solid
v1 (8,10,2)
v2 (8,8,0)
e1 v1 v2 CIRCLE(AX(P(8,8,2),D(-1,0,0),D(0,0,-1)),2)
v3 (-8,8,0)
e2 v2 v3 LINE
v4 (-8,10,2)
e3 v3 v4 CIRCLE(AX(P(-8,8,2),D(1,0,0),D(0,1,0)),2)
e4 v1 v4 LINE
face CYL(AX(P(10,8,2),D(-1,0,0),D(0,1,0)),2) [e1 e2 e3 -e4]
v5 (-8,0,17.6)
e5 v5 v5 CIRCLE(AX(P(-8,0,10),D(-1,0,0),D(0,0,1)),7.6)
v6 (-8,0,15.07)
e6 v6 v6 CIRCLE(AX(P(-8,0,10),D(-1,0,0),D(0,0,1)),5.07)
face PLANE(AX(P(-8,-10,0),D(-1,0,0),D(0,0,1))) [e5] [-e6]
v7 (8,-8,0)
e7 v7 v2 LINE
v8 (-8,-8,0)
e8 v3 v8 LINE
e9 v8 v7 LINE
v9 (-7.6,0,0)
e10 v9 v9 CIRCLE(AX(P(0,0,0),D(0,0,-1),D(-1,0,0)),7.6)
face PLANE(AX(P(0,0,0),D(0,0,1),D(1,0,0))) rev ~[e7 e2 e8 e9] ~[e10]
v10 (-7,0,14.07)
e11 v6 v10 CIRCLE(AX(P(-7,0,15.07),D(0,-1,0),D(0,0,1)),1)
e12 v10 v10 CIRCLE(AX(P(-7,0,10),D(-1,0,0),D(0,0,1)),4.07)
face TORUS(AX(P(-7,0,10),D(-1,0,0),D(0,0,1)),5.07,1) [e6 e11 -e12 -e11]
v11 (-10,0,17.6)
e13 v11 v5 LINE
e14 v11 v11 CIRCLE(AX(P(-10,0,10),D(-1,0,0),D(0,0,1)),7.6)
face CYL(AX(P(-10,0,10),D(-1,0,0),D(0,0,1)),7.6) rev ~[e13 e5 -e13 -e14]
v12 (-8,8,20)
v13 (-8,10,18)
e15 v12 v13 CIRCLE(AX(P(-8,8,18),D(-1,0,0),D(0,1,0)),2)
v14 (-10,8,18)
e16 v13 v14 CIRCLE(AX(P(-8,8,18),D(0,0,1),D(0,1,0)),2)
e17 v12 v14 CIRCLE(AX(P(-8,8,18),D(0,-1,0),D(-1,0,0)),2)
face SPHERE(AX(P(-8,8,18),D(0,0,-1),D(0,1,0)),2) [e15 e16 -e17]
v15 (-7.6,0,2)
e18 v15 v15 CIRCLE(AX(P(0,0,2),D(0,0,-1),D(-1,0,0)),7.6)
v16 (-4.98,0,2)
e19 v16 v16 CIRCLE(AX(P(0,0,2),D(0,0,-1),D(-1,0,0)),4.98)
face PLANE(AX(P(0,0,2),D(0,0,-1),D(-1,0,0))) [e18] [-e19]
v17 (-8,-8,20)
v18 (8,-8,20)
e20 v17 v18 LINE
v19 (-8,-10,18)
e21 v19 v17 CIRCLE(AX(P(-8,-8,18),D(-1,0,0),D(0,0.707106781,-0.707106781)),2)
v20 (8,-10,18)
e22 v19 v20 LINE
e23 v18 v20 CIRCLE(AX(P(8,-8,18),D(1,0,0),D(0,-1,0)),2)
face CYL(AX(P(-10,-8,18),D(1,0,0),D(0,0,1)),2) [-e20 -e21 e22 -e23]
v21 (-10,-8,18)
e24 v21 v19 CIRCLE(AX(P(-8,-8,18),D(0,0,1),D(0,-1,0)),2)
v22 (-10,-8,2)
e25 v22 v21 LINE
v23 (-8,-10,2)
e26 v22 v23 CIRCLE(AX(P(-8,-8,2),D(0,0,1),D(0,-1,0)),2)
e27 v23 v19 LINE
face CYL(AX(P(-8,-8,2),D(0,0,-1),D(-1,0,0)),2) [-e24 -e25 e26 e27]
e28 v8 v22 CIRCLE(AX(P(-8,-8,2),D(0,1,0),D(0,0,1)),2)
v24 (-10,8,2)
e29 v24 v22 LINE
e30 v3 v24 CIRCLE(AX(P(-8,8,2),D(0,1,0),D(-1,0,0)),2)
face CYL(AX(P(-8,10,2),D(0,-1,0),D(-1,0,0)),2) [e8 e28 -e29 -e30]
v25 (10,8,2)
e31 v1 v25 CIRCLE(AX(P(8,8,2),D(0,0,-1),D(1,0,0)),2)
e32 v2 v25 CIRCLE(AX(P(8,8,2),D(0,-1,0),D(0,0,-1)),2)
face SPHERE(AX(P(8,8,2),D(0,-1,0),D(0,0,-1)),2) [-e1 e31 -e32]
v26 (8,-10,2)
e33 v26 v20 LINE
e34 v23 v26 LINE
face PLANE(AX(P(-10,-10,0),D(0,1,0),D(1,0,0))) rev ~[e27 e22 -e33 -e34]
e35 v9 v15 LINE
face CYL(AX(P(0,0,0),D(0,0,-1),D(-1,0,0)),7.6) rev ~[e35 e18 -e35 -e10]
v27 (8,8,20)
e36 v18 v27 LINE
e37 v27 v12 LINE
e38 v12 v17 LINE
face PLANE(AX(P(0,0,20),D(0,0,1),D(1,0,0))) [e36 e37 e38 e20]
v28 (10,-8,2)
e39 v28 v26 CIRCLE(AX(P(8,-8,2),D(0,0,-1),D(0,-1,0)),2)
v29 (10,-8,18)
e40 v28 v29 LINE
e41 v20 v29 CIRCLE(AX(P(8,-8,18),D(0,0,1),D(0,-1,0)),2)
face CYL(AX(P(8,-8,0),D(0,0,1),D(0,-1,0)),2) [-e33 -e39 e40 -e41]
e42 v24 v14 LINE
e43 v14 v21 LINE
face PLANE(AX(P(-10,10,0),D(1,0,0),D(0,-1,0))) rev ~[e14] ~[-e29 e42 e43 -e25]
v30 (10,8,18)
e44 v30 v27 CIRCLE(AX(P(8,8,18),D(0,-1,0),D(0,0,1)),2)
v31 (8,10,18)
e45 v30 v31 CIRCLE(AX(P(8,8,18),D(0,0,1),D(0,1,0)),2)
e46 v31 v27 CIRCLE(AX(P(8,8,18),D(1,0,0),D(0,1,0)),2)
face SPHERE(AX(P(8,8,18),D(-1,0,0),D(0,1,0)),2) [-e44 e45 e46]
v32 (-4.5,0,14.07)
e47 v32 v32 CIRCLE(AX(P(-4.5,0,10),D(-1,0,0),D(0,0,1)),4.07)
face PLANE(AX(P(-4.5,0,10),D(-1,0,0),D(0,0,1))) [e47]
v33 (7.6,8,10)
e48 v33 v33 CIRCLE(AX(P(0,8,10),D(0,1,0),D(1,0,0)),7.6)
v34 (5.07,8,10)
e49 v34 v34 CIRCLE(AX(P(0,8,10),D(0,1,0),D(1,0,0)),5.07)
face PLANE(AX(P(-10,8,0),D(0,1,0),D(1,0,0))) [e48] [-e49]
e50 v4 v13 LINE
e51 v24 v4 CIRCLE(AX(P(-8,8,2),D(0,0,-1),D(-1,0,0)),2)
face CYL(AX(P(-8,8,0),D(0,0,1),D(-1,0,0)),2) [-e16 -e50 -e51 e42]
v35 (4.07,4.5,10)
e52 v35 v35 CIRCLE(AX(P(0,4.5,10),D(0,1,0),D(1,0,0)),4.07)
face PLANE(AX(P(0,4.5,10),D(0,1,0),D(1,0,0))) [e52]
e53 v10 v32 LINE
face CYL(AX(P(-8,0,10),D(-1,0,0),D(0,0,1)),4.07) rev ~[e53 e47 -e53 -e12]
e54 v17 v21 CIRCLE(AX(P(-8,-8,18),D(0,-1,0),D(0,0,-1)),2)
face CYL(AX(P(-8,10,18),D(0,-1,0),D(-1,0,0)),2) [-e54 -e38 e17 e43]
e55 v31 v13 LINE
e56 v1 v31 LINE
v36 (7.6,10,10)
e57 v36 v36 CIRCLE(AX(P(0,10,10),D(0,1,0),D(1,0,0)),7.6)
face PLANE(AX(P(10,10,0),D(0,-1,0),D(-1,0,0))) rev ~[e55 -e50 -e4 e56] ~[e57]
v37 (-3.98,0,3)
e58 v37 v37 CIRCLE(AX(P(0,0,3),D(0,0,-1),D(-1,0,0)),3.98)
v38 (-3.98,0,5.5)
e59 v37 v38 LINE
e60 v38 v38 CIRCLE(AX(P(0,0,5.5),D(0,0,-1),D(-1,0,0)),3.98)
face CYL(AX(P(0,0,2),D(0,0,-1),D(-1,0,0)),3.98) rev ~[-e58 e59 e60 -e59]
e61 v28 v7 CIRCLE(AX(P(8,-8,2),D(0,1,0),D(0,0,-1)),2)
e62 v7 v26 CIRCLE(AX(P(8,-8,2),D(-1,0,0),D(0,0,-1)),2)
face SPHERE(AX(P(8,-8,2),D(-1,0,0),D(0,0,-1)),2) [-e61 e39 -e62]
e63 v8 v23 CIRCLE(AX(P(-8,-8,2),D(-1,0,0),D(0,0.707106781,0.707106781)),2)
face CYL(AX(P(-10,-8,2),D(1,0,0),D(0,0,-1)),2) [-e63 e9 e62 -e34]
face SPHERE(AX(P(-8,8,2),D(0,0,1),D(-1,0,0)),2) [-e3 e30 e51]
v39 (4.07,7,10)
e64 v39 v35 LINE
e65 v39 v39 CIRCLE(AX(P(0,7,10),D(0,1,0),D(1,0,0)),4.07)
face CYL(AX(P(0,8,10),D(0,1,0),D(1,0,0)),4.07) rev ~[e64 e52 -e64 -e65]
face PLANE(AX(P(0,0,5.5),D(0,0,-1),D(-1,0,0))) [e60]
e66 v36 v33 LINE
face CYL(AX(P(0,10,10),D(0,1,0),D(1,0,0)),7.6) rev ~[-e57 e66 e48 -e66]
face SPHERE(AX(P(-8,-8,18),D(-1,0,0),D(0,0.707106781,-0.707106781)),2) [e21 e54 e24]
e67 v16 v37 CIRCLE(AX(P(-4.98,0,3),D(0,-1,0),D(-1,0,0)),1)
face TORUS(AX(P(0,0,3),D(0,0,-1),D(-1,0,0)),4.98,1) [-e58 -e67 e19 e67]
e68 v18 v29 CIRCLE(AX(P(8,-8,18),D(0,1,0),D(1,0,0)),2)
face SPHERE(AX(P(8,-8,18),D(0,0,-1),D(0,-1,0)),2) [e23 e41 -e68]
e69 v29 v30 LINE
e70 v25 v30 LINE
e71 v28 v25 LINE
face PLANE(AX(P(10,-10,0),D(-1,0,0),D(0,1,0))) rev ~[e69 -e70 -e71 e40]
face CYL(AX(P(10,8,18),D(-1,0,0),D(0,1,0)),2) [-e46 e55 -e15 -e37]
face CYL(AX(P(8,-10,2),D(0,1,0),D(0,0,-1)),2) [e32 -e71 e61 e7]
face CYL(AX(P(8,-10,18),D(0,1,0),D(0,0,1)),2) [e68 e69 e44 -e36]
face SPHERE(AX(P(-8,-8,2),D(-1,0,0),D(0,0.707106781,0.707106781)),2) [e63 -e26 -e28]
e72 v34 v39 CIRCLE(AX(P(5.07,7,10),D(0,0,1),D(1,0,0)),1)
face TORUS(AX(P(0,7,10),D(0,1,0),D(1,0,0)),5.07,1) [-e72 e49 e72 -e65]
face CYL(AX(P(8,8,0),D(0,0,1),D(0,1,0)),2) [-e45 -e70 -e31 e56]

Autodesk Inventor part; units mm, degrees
ref_plane "YZ Plane" through (0, 0, 0) normal (1, 0, 0) x (0, 1, 0)
ref_plane "XZ Plane" through (0, 0, 0) normal (0, 1, 0) x (-1, 0, 0)
ref_plane "XY Plane" through (0, 0, 0) normal (0, 0, 1) x (1, 0, 0)
sketch "Sketch1" plane through (0, 0, 0) normal (0, 0, 1) x (1, 0, 0)
  line L0 (-10, -10) -> (10, -10)
  line L1 (10, -10) -> (10, 10)
  line L2 (10, 10) -> (-10, 10)
  line L3 (-10, 10) -> (-10, -10)
  line L4 (-10, -10) -> (10, 10) construction
  line L5 (10, -10) -> (-10, 10) construction
  point P0 (0, 0)
  dimension "d0" = 20
  dimension "d1" = 20
extrude "Extrusion1" add sketch "Sketch1" along normal blind 20
sketch "Sketch2" plane through (-10, 10, 0) normal (0, 1, 0) x (1, 0, 0)
  circle A0 centre (10, -10) radius 7.6
  line L0 (0, 0) -> (0, -20) projected
  point P0 (10, 0)
  dimension "d4" = 15.2
  dimension "d5" = 10
  dimension "d6" = 10
extrude "Extrusion2" cut sketch "Sketch2" against normal blind 2
sketch "Sketch3" plane through (0, 0, 0) normal (0, 0, -1) x (-1, 0, 0)
  circle A0 centre (0, 0) radius 7.6
  dimension "d9" = 15.2
extrude "Extrusion3" cut sketch "Sketch3" against normal blind 2
sketch "Sketch4" plane through (-10, -10, 0) normal (-1, 0, 0) x (0, 0, 1)
  circle A0 centre (10, 10) radius 7.6
  line L0 (0, 20) -> (0, 0) projected
  line L1 (0, 20) -> (20, 20) projected
  point P0 (0, 10)
  dimension "d12" = 15.2
  dimension "d13" = 10
  dimension "d14" = 10
extrude "Extrusion4" cut sketch "Sketch4" against normal blind 2
fillet "Fillet1" radius 2 11 edges at (-10, 10, 10) (0, 10, 20) (-10, 0, 20) (-10, 0, 0) (0, -10, 0) (10, 0, 0) (0, 10, 0) (10, 10, 10) (10, -10, 10) (0, -10, 20) (10, 0, 20)
sketch "Sketch5" plane through (-8, 0, 10) normal (-1, 0, 0) x (0, 0, 1)
  circle A0 centre (0, 0) radius 4.07
  point P0 (-10, 0)
  dimension "d18" = 8.14
extrude "Extrusion5" cut sketch "Sketch5" against normal blind 3.5
sketch "Sketch6" plane through (0, 0, 2) normal (0, 0, -1) x (-1, 0, 0)
  circle A0 centre (0, 0) radius 3.98
  dimension "d21" = 7.96
extrude "Extrusion6" cut sketch "Sketch6" against normal blind 3.5
sketch "Sketch7" plane through (0, 8, 10) normal (0, 1, 0) x (1, 0, 0)
  circle A0 centre (0, 0) radius 4.07
  point P0 (0, 10)
  dimension "d24" = 8.14
extrude "Extrusion7" cut sketch "Sketch7" against normal blind 3.5
fillet "Fillet2" radius 2 3 edges at (-9.4142, -9.4142, 19.4142) (-9.4142, -9.4142, 0.5858) (-10, -10, 10)
fillet "Fillet3" radius 1 1 edges at (-8, 0, 5.93)
fillet "Fillet4" radius 1 1 edges at (-4.07, 8, 10)
fillet "Fillet5" radius 1 1 edges at (3.98, 0, 2)
equation "\"d1\" = d0"
equation "\"d6\" = d5"
equation "\"d13\" = d14"
properties part number "Center"
